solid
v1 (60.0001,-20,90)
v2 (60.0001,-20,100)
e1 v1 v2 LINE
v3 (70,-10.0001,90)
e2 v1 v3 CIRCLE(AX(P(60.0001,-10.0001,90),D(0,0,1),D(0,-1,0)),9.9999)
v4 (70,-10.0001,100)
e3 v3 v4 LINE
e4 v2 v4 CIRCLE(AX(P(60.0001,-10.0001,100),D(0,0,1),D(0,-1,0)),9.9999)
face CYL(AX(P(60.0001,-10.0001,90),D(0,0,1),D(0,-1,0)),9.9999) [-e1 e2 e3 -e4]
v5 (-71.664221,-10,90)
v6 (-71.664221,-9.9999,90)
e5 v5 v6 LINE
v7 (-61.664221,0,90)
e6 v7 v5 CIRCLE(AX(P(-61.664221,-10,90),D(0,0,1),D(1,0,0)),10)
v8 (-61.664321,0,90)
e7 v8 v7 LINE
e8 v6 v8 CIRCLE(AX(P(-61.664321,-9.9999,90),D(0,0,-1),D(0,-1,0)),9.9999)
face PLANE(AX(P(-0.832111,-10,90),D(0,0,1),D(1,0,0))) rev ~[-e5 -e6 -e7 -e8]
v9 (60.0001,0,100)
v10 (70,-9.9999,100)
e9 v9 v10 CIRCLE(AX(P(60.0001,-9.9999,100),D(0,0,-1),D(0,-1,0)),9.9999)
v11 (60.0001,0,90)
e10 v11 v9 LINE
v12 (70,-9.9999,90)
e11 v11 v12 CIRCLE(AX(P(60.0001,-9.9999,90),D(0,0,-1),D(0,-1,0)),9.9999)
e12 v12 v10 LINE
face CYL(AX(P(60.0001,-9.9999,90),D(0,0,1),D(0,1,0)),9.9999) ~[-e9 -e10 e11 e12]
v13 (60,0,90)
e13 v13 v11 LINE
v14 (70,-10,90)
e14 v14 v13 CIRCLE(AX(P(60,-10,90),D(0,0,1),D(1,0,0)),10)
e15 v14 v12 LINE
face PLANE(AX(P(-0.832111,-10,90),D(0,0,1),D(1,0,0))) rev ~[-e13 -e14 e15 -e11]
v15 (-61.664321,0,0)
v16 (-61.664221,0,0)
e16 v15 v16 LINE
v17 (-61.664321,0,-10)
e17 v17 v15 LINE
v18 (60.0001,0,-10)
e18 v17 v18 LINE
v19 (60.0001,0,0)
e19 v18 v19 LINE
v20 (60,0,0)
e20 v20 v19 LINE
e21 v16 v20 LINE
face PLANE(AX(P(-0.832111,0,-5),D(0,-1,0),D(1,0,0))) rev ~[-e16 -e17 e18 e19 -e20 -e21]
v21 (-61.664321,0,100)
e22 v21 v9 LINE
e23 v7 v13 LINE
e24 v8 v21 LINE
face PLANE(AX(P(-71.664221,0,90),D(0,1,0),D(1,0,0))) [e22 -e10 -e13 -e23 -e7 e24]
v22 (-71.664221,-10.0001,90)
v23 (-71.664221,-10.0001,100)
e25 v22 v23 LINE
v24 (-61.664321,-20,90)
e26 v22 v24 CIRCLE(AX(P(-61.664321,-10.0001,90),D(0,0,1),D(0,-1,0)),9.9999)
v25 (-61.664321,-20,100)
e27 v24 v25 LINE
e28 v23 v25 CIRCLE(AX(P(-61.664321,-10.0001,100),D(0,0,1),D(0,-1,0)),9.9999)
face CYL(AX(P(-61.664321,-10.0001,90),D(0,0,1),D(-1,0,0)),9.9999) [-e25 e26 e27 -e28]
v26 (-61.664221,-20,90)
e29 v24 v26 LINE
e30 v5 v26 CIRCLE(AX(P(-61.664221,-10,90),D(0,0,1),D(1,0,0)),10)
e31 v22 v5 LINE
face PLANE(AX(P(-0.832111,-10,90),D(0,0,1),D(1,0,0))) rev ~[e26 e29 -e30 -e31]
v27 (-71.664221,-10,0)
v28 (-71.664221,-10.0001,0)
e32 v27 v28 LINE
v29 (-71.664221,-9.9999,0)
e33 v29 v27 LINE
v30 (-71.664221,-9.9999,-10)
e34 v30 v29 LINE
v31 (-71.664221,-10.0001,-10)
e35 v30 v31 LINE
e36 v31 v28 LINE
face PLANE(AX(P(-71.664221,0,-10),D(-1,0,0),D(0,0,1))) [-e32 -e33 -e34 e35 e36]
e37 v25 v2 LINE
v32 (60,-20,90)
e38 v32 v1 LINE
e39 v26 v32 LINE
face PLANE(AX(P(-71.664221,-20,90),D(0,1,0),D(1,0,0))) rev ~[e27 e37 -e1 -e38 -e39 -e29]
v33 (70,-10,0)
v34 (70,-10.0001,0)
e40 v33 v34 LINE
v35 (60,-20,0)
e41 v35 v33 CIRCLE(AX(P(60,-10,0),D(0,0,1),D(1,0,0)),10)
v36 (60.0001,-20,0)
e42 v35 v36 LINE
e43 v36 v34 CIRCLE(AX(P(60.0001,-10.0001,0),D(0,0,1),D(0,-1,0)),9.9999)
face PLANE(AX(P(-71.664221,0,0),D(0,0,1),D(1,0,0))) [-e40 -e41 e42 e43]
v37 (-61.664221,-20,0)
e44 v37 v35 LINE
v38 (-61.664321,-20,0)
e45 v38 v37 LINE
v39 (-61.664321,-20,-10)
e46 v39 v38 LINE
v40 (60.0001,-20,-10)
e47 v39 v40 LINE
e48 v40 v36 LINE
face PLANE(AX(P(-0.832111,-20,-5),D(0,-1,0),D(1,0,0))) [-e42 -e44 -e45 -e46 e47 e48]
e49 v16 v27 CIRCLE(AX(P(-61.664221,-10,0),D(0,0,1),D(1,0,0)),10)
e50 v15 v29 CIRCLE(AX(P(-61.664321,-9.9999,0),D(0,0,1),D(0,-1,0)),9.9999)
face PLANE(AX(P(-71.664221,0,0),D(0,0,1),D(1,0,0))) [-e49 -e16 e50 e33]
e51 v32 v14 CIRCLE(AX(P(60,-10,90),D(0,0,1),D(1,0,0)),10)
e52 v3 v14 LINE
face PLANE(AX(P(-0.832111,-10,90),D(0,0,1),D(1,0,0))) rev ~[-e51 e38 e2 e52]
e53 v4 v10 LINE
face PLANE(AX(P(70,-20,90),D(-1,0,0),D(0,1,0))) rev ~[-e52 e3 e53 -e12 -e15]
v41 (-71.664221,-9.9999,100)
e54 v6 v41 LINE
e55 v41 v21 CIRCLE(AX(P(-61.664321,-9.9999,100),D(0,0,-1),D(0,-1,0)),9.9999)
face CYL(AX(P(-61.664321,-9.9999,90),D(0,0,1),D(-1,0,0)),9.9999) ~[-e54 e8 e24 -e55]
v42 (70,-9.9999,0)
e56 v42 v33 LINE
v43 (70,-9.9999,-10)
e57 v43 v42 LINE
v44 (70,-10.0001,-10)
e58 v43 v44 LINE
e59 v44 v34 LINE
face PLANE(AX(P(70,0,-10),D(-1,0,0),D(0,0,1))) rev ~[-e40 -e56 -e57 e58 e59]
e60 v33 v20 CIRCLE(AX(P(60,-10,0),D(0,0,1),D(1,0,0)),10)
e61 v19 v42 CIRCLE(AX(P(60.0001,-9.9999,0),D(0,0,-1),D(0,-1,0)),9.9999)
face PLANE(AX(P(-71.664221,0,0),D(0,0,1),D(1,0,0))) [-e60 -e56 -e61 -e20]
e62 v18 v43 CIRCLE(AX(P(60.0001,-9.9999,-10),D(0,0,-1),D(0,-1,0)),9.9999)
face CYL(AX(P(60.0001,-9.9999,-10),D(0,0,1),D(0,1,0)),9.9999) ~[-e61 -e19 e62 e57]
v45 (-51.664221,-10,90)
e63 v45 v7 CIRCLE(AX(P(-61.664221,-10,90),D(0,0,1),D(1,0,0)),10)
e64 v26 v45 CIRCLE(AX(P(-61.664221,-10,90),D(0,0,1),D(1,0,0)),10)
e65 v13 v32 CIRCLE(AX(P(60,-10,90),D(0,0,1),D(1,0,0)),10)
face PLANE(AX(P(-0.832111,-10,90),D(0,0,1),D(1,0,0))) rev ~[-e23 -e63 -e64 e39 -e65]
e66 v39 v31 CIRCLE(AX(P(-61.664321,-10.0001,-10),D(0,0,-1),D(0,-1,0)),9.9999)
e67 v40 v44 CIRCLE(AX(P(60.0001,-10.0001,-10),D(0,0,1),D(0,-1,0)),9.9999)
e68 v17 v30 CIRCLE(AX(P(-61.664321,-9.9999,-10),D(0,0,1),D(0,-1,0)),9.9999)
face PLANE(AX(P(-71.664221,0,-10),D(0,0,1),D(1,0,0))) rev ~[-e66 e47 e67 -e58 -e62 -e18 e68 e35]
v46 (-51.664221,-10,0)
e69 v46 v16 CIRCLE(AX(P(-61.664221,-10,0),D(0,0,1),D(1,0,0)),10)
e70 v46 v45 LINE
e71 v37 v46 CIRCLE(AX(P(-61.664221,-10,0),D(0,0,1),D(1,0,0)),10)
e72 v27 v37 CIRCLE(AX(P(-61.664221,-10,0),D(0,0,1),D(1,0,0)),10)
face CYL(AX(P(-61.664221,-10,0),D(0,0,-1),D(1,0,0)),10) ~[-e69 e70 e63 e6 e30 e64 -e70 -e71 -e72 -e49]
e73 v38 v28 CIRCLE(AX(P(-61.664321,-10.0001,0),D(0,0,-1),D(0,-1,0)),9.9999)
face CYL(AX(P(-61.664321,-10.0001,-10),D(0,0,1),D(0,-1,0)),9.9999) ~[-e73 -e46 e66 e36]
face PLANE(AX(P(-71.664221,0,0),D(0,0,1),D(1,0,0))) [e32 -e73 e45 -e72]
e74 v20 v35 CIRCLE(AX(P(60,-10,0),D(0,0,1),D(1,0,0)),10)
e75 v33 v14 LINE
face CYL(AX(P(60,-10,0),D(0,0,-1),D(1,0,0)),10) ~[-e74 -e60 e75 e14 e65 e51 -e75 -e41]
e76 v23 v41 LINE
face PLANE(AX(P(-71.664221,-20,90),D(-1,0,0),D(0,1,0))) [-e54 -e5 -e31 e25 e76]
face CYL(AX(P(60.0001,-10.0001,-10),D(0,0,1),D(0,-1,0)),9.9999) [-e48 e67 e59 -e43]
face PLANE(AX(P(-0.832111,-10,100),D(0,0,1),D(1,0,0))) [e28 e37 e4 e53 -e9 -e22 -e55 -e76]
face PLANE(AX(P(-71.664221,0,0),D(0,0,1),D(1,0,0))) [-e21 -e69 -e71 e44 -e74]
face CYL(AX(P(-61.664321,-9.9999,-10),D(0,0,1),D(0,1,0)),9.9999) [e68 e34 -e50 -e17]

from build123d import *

# Parameters (mm, degrees)
F0_W     = 141.6642213652
F0_H     = 10
F1_DEPTH = 20
F2_R     = 10
F3_DEPTH = 90
F4_W     = 141.6642213652
F4_H     = 20
F5_DEPTH = 10
F6_R     = 9.9999


# Not quite as in the source:
# - a fillet or chamfer is up to 0.001 mm smaller than in the source, because OpenCascade refuses the exact size


with BuildPart() as f1:
    # F0 (on Front) → F1 (new body)
    with BuildSketch(Plane.XZ):
        with Locations((-0.8321106826, -5)):
            Rectangle(F0_W, F0_H)
    extrude(amount=F1_DEPTH)

    # F2 (on face) → F3 (join)
    with BuildSketch(Plane.XY):
        with Locations((-61.6642213652, -10)):
            Circle(F2_R)
        with Locations((60, -10)):
            Circle(F2_R)
    extrude(amount=F3_DEPTH)

    # F4 (on face) → F5 (join)
    with BuildSketch(Plane.XY.offset(90)):
        with Locations((-0.8321106826, -10)):
            Rectangle(F4_W, F4_H)
    extrude(amount=F5_DEPTH)

    # F6 (radius 10 in the source; OpenCascade refuses exactly that, so slightly less here)
    f6_edges = [f1.edges().sort_by_distance(p)[0] for p in [
        (-71.664221, -20, -5),
        (-71.664221, 0, -5),
        (-71.664221, -20, 95),
        (-71.664221, 0, 95),
        (70, 0, 95),
        (70, -20, 95),
        (70, 0, -5),
        (70, -20, -5),
    ]]
    fillet(f6_edges, radius=F6_R)


solid = f1.part
